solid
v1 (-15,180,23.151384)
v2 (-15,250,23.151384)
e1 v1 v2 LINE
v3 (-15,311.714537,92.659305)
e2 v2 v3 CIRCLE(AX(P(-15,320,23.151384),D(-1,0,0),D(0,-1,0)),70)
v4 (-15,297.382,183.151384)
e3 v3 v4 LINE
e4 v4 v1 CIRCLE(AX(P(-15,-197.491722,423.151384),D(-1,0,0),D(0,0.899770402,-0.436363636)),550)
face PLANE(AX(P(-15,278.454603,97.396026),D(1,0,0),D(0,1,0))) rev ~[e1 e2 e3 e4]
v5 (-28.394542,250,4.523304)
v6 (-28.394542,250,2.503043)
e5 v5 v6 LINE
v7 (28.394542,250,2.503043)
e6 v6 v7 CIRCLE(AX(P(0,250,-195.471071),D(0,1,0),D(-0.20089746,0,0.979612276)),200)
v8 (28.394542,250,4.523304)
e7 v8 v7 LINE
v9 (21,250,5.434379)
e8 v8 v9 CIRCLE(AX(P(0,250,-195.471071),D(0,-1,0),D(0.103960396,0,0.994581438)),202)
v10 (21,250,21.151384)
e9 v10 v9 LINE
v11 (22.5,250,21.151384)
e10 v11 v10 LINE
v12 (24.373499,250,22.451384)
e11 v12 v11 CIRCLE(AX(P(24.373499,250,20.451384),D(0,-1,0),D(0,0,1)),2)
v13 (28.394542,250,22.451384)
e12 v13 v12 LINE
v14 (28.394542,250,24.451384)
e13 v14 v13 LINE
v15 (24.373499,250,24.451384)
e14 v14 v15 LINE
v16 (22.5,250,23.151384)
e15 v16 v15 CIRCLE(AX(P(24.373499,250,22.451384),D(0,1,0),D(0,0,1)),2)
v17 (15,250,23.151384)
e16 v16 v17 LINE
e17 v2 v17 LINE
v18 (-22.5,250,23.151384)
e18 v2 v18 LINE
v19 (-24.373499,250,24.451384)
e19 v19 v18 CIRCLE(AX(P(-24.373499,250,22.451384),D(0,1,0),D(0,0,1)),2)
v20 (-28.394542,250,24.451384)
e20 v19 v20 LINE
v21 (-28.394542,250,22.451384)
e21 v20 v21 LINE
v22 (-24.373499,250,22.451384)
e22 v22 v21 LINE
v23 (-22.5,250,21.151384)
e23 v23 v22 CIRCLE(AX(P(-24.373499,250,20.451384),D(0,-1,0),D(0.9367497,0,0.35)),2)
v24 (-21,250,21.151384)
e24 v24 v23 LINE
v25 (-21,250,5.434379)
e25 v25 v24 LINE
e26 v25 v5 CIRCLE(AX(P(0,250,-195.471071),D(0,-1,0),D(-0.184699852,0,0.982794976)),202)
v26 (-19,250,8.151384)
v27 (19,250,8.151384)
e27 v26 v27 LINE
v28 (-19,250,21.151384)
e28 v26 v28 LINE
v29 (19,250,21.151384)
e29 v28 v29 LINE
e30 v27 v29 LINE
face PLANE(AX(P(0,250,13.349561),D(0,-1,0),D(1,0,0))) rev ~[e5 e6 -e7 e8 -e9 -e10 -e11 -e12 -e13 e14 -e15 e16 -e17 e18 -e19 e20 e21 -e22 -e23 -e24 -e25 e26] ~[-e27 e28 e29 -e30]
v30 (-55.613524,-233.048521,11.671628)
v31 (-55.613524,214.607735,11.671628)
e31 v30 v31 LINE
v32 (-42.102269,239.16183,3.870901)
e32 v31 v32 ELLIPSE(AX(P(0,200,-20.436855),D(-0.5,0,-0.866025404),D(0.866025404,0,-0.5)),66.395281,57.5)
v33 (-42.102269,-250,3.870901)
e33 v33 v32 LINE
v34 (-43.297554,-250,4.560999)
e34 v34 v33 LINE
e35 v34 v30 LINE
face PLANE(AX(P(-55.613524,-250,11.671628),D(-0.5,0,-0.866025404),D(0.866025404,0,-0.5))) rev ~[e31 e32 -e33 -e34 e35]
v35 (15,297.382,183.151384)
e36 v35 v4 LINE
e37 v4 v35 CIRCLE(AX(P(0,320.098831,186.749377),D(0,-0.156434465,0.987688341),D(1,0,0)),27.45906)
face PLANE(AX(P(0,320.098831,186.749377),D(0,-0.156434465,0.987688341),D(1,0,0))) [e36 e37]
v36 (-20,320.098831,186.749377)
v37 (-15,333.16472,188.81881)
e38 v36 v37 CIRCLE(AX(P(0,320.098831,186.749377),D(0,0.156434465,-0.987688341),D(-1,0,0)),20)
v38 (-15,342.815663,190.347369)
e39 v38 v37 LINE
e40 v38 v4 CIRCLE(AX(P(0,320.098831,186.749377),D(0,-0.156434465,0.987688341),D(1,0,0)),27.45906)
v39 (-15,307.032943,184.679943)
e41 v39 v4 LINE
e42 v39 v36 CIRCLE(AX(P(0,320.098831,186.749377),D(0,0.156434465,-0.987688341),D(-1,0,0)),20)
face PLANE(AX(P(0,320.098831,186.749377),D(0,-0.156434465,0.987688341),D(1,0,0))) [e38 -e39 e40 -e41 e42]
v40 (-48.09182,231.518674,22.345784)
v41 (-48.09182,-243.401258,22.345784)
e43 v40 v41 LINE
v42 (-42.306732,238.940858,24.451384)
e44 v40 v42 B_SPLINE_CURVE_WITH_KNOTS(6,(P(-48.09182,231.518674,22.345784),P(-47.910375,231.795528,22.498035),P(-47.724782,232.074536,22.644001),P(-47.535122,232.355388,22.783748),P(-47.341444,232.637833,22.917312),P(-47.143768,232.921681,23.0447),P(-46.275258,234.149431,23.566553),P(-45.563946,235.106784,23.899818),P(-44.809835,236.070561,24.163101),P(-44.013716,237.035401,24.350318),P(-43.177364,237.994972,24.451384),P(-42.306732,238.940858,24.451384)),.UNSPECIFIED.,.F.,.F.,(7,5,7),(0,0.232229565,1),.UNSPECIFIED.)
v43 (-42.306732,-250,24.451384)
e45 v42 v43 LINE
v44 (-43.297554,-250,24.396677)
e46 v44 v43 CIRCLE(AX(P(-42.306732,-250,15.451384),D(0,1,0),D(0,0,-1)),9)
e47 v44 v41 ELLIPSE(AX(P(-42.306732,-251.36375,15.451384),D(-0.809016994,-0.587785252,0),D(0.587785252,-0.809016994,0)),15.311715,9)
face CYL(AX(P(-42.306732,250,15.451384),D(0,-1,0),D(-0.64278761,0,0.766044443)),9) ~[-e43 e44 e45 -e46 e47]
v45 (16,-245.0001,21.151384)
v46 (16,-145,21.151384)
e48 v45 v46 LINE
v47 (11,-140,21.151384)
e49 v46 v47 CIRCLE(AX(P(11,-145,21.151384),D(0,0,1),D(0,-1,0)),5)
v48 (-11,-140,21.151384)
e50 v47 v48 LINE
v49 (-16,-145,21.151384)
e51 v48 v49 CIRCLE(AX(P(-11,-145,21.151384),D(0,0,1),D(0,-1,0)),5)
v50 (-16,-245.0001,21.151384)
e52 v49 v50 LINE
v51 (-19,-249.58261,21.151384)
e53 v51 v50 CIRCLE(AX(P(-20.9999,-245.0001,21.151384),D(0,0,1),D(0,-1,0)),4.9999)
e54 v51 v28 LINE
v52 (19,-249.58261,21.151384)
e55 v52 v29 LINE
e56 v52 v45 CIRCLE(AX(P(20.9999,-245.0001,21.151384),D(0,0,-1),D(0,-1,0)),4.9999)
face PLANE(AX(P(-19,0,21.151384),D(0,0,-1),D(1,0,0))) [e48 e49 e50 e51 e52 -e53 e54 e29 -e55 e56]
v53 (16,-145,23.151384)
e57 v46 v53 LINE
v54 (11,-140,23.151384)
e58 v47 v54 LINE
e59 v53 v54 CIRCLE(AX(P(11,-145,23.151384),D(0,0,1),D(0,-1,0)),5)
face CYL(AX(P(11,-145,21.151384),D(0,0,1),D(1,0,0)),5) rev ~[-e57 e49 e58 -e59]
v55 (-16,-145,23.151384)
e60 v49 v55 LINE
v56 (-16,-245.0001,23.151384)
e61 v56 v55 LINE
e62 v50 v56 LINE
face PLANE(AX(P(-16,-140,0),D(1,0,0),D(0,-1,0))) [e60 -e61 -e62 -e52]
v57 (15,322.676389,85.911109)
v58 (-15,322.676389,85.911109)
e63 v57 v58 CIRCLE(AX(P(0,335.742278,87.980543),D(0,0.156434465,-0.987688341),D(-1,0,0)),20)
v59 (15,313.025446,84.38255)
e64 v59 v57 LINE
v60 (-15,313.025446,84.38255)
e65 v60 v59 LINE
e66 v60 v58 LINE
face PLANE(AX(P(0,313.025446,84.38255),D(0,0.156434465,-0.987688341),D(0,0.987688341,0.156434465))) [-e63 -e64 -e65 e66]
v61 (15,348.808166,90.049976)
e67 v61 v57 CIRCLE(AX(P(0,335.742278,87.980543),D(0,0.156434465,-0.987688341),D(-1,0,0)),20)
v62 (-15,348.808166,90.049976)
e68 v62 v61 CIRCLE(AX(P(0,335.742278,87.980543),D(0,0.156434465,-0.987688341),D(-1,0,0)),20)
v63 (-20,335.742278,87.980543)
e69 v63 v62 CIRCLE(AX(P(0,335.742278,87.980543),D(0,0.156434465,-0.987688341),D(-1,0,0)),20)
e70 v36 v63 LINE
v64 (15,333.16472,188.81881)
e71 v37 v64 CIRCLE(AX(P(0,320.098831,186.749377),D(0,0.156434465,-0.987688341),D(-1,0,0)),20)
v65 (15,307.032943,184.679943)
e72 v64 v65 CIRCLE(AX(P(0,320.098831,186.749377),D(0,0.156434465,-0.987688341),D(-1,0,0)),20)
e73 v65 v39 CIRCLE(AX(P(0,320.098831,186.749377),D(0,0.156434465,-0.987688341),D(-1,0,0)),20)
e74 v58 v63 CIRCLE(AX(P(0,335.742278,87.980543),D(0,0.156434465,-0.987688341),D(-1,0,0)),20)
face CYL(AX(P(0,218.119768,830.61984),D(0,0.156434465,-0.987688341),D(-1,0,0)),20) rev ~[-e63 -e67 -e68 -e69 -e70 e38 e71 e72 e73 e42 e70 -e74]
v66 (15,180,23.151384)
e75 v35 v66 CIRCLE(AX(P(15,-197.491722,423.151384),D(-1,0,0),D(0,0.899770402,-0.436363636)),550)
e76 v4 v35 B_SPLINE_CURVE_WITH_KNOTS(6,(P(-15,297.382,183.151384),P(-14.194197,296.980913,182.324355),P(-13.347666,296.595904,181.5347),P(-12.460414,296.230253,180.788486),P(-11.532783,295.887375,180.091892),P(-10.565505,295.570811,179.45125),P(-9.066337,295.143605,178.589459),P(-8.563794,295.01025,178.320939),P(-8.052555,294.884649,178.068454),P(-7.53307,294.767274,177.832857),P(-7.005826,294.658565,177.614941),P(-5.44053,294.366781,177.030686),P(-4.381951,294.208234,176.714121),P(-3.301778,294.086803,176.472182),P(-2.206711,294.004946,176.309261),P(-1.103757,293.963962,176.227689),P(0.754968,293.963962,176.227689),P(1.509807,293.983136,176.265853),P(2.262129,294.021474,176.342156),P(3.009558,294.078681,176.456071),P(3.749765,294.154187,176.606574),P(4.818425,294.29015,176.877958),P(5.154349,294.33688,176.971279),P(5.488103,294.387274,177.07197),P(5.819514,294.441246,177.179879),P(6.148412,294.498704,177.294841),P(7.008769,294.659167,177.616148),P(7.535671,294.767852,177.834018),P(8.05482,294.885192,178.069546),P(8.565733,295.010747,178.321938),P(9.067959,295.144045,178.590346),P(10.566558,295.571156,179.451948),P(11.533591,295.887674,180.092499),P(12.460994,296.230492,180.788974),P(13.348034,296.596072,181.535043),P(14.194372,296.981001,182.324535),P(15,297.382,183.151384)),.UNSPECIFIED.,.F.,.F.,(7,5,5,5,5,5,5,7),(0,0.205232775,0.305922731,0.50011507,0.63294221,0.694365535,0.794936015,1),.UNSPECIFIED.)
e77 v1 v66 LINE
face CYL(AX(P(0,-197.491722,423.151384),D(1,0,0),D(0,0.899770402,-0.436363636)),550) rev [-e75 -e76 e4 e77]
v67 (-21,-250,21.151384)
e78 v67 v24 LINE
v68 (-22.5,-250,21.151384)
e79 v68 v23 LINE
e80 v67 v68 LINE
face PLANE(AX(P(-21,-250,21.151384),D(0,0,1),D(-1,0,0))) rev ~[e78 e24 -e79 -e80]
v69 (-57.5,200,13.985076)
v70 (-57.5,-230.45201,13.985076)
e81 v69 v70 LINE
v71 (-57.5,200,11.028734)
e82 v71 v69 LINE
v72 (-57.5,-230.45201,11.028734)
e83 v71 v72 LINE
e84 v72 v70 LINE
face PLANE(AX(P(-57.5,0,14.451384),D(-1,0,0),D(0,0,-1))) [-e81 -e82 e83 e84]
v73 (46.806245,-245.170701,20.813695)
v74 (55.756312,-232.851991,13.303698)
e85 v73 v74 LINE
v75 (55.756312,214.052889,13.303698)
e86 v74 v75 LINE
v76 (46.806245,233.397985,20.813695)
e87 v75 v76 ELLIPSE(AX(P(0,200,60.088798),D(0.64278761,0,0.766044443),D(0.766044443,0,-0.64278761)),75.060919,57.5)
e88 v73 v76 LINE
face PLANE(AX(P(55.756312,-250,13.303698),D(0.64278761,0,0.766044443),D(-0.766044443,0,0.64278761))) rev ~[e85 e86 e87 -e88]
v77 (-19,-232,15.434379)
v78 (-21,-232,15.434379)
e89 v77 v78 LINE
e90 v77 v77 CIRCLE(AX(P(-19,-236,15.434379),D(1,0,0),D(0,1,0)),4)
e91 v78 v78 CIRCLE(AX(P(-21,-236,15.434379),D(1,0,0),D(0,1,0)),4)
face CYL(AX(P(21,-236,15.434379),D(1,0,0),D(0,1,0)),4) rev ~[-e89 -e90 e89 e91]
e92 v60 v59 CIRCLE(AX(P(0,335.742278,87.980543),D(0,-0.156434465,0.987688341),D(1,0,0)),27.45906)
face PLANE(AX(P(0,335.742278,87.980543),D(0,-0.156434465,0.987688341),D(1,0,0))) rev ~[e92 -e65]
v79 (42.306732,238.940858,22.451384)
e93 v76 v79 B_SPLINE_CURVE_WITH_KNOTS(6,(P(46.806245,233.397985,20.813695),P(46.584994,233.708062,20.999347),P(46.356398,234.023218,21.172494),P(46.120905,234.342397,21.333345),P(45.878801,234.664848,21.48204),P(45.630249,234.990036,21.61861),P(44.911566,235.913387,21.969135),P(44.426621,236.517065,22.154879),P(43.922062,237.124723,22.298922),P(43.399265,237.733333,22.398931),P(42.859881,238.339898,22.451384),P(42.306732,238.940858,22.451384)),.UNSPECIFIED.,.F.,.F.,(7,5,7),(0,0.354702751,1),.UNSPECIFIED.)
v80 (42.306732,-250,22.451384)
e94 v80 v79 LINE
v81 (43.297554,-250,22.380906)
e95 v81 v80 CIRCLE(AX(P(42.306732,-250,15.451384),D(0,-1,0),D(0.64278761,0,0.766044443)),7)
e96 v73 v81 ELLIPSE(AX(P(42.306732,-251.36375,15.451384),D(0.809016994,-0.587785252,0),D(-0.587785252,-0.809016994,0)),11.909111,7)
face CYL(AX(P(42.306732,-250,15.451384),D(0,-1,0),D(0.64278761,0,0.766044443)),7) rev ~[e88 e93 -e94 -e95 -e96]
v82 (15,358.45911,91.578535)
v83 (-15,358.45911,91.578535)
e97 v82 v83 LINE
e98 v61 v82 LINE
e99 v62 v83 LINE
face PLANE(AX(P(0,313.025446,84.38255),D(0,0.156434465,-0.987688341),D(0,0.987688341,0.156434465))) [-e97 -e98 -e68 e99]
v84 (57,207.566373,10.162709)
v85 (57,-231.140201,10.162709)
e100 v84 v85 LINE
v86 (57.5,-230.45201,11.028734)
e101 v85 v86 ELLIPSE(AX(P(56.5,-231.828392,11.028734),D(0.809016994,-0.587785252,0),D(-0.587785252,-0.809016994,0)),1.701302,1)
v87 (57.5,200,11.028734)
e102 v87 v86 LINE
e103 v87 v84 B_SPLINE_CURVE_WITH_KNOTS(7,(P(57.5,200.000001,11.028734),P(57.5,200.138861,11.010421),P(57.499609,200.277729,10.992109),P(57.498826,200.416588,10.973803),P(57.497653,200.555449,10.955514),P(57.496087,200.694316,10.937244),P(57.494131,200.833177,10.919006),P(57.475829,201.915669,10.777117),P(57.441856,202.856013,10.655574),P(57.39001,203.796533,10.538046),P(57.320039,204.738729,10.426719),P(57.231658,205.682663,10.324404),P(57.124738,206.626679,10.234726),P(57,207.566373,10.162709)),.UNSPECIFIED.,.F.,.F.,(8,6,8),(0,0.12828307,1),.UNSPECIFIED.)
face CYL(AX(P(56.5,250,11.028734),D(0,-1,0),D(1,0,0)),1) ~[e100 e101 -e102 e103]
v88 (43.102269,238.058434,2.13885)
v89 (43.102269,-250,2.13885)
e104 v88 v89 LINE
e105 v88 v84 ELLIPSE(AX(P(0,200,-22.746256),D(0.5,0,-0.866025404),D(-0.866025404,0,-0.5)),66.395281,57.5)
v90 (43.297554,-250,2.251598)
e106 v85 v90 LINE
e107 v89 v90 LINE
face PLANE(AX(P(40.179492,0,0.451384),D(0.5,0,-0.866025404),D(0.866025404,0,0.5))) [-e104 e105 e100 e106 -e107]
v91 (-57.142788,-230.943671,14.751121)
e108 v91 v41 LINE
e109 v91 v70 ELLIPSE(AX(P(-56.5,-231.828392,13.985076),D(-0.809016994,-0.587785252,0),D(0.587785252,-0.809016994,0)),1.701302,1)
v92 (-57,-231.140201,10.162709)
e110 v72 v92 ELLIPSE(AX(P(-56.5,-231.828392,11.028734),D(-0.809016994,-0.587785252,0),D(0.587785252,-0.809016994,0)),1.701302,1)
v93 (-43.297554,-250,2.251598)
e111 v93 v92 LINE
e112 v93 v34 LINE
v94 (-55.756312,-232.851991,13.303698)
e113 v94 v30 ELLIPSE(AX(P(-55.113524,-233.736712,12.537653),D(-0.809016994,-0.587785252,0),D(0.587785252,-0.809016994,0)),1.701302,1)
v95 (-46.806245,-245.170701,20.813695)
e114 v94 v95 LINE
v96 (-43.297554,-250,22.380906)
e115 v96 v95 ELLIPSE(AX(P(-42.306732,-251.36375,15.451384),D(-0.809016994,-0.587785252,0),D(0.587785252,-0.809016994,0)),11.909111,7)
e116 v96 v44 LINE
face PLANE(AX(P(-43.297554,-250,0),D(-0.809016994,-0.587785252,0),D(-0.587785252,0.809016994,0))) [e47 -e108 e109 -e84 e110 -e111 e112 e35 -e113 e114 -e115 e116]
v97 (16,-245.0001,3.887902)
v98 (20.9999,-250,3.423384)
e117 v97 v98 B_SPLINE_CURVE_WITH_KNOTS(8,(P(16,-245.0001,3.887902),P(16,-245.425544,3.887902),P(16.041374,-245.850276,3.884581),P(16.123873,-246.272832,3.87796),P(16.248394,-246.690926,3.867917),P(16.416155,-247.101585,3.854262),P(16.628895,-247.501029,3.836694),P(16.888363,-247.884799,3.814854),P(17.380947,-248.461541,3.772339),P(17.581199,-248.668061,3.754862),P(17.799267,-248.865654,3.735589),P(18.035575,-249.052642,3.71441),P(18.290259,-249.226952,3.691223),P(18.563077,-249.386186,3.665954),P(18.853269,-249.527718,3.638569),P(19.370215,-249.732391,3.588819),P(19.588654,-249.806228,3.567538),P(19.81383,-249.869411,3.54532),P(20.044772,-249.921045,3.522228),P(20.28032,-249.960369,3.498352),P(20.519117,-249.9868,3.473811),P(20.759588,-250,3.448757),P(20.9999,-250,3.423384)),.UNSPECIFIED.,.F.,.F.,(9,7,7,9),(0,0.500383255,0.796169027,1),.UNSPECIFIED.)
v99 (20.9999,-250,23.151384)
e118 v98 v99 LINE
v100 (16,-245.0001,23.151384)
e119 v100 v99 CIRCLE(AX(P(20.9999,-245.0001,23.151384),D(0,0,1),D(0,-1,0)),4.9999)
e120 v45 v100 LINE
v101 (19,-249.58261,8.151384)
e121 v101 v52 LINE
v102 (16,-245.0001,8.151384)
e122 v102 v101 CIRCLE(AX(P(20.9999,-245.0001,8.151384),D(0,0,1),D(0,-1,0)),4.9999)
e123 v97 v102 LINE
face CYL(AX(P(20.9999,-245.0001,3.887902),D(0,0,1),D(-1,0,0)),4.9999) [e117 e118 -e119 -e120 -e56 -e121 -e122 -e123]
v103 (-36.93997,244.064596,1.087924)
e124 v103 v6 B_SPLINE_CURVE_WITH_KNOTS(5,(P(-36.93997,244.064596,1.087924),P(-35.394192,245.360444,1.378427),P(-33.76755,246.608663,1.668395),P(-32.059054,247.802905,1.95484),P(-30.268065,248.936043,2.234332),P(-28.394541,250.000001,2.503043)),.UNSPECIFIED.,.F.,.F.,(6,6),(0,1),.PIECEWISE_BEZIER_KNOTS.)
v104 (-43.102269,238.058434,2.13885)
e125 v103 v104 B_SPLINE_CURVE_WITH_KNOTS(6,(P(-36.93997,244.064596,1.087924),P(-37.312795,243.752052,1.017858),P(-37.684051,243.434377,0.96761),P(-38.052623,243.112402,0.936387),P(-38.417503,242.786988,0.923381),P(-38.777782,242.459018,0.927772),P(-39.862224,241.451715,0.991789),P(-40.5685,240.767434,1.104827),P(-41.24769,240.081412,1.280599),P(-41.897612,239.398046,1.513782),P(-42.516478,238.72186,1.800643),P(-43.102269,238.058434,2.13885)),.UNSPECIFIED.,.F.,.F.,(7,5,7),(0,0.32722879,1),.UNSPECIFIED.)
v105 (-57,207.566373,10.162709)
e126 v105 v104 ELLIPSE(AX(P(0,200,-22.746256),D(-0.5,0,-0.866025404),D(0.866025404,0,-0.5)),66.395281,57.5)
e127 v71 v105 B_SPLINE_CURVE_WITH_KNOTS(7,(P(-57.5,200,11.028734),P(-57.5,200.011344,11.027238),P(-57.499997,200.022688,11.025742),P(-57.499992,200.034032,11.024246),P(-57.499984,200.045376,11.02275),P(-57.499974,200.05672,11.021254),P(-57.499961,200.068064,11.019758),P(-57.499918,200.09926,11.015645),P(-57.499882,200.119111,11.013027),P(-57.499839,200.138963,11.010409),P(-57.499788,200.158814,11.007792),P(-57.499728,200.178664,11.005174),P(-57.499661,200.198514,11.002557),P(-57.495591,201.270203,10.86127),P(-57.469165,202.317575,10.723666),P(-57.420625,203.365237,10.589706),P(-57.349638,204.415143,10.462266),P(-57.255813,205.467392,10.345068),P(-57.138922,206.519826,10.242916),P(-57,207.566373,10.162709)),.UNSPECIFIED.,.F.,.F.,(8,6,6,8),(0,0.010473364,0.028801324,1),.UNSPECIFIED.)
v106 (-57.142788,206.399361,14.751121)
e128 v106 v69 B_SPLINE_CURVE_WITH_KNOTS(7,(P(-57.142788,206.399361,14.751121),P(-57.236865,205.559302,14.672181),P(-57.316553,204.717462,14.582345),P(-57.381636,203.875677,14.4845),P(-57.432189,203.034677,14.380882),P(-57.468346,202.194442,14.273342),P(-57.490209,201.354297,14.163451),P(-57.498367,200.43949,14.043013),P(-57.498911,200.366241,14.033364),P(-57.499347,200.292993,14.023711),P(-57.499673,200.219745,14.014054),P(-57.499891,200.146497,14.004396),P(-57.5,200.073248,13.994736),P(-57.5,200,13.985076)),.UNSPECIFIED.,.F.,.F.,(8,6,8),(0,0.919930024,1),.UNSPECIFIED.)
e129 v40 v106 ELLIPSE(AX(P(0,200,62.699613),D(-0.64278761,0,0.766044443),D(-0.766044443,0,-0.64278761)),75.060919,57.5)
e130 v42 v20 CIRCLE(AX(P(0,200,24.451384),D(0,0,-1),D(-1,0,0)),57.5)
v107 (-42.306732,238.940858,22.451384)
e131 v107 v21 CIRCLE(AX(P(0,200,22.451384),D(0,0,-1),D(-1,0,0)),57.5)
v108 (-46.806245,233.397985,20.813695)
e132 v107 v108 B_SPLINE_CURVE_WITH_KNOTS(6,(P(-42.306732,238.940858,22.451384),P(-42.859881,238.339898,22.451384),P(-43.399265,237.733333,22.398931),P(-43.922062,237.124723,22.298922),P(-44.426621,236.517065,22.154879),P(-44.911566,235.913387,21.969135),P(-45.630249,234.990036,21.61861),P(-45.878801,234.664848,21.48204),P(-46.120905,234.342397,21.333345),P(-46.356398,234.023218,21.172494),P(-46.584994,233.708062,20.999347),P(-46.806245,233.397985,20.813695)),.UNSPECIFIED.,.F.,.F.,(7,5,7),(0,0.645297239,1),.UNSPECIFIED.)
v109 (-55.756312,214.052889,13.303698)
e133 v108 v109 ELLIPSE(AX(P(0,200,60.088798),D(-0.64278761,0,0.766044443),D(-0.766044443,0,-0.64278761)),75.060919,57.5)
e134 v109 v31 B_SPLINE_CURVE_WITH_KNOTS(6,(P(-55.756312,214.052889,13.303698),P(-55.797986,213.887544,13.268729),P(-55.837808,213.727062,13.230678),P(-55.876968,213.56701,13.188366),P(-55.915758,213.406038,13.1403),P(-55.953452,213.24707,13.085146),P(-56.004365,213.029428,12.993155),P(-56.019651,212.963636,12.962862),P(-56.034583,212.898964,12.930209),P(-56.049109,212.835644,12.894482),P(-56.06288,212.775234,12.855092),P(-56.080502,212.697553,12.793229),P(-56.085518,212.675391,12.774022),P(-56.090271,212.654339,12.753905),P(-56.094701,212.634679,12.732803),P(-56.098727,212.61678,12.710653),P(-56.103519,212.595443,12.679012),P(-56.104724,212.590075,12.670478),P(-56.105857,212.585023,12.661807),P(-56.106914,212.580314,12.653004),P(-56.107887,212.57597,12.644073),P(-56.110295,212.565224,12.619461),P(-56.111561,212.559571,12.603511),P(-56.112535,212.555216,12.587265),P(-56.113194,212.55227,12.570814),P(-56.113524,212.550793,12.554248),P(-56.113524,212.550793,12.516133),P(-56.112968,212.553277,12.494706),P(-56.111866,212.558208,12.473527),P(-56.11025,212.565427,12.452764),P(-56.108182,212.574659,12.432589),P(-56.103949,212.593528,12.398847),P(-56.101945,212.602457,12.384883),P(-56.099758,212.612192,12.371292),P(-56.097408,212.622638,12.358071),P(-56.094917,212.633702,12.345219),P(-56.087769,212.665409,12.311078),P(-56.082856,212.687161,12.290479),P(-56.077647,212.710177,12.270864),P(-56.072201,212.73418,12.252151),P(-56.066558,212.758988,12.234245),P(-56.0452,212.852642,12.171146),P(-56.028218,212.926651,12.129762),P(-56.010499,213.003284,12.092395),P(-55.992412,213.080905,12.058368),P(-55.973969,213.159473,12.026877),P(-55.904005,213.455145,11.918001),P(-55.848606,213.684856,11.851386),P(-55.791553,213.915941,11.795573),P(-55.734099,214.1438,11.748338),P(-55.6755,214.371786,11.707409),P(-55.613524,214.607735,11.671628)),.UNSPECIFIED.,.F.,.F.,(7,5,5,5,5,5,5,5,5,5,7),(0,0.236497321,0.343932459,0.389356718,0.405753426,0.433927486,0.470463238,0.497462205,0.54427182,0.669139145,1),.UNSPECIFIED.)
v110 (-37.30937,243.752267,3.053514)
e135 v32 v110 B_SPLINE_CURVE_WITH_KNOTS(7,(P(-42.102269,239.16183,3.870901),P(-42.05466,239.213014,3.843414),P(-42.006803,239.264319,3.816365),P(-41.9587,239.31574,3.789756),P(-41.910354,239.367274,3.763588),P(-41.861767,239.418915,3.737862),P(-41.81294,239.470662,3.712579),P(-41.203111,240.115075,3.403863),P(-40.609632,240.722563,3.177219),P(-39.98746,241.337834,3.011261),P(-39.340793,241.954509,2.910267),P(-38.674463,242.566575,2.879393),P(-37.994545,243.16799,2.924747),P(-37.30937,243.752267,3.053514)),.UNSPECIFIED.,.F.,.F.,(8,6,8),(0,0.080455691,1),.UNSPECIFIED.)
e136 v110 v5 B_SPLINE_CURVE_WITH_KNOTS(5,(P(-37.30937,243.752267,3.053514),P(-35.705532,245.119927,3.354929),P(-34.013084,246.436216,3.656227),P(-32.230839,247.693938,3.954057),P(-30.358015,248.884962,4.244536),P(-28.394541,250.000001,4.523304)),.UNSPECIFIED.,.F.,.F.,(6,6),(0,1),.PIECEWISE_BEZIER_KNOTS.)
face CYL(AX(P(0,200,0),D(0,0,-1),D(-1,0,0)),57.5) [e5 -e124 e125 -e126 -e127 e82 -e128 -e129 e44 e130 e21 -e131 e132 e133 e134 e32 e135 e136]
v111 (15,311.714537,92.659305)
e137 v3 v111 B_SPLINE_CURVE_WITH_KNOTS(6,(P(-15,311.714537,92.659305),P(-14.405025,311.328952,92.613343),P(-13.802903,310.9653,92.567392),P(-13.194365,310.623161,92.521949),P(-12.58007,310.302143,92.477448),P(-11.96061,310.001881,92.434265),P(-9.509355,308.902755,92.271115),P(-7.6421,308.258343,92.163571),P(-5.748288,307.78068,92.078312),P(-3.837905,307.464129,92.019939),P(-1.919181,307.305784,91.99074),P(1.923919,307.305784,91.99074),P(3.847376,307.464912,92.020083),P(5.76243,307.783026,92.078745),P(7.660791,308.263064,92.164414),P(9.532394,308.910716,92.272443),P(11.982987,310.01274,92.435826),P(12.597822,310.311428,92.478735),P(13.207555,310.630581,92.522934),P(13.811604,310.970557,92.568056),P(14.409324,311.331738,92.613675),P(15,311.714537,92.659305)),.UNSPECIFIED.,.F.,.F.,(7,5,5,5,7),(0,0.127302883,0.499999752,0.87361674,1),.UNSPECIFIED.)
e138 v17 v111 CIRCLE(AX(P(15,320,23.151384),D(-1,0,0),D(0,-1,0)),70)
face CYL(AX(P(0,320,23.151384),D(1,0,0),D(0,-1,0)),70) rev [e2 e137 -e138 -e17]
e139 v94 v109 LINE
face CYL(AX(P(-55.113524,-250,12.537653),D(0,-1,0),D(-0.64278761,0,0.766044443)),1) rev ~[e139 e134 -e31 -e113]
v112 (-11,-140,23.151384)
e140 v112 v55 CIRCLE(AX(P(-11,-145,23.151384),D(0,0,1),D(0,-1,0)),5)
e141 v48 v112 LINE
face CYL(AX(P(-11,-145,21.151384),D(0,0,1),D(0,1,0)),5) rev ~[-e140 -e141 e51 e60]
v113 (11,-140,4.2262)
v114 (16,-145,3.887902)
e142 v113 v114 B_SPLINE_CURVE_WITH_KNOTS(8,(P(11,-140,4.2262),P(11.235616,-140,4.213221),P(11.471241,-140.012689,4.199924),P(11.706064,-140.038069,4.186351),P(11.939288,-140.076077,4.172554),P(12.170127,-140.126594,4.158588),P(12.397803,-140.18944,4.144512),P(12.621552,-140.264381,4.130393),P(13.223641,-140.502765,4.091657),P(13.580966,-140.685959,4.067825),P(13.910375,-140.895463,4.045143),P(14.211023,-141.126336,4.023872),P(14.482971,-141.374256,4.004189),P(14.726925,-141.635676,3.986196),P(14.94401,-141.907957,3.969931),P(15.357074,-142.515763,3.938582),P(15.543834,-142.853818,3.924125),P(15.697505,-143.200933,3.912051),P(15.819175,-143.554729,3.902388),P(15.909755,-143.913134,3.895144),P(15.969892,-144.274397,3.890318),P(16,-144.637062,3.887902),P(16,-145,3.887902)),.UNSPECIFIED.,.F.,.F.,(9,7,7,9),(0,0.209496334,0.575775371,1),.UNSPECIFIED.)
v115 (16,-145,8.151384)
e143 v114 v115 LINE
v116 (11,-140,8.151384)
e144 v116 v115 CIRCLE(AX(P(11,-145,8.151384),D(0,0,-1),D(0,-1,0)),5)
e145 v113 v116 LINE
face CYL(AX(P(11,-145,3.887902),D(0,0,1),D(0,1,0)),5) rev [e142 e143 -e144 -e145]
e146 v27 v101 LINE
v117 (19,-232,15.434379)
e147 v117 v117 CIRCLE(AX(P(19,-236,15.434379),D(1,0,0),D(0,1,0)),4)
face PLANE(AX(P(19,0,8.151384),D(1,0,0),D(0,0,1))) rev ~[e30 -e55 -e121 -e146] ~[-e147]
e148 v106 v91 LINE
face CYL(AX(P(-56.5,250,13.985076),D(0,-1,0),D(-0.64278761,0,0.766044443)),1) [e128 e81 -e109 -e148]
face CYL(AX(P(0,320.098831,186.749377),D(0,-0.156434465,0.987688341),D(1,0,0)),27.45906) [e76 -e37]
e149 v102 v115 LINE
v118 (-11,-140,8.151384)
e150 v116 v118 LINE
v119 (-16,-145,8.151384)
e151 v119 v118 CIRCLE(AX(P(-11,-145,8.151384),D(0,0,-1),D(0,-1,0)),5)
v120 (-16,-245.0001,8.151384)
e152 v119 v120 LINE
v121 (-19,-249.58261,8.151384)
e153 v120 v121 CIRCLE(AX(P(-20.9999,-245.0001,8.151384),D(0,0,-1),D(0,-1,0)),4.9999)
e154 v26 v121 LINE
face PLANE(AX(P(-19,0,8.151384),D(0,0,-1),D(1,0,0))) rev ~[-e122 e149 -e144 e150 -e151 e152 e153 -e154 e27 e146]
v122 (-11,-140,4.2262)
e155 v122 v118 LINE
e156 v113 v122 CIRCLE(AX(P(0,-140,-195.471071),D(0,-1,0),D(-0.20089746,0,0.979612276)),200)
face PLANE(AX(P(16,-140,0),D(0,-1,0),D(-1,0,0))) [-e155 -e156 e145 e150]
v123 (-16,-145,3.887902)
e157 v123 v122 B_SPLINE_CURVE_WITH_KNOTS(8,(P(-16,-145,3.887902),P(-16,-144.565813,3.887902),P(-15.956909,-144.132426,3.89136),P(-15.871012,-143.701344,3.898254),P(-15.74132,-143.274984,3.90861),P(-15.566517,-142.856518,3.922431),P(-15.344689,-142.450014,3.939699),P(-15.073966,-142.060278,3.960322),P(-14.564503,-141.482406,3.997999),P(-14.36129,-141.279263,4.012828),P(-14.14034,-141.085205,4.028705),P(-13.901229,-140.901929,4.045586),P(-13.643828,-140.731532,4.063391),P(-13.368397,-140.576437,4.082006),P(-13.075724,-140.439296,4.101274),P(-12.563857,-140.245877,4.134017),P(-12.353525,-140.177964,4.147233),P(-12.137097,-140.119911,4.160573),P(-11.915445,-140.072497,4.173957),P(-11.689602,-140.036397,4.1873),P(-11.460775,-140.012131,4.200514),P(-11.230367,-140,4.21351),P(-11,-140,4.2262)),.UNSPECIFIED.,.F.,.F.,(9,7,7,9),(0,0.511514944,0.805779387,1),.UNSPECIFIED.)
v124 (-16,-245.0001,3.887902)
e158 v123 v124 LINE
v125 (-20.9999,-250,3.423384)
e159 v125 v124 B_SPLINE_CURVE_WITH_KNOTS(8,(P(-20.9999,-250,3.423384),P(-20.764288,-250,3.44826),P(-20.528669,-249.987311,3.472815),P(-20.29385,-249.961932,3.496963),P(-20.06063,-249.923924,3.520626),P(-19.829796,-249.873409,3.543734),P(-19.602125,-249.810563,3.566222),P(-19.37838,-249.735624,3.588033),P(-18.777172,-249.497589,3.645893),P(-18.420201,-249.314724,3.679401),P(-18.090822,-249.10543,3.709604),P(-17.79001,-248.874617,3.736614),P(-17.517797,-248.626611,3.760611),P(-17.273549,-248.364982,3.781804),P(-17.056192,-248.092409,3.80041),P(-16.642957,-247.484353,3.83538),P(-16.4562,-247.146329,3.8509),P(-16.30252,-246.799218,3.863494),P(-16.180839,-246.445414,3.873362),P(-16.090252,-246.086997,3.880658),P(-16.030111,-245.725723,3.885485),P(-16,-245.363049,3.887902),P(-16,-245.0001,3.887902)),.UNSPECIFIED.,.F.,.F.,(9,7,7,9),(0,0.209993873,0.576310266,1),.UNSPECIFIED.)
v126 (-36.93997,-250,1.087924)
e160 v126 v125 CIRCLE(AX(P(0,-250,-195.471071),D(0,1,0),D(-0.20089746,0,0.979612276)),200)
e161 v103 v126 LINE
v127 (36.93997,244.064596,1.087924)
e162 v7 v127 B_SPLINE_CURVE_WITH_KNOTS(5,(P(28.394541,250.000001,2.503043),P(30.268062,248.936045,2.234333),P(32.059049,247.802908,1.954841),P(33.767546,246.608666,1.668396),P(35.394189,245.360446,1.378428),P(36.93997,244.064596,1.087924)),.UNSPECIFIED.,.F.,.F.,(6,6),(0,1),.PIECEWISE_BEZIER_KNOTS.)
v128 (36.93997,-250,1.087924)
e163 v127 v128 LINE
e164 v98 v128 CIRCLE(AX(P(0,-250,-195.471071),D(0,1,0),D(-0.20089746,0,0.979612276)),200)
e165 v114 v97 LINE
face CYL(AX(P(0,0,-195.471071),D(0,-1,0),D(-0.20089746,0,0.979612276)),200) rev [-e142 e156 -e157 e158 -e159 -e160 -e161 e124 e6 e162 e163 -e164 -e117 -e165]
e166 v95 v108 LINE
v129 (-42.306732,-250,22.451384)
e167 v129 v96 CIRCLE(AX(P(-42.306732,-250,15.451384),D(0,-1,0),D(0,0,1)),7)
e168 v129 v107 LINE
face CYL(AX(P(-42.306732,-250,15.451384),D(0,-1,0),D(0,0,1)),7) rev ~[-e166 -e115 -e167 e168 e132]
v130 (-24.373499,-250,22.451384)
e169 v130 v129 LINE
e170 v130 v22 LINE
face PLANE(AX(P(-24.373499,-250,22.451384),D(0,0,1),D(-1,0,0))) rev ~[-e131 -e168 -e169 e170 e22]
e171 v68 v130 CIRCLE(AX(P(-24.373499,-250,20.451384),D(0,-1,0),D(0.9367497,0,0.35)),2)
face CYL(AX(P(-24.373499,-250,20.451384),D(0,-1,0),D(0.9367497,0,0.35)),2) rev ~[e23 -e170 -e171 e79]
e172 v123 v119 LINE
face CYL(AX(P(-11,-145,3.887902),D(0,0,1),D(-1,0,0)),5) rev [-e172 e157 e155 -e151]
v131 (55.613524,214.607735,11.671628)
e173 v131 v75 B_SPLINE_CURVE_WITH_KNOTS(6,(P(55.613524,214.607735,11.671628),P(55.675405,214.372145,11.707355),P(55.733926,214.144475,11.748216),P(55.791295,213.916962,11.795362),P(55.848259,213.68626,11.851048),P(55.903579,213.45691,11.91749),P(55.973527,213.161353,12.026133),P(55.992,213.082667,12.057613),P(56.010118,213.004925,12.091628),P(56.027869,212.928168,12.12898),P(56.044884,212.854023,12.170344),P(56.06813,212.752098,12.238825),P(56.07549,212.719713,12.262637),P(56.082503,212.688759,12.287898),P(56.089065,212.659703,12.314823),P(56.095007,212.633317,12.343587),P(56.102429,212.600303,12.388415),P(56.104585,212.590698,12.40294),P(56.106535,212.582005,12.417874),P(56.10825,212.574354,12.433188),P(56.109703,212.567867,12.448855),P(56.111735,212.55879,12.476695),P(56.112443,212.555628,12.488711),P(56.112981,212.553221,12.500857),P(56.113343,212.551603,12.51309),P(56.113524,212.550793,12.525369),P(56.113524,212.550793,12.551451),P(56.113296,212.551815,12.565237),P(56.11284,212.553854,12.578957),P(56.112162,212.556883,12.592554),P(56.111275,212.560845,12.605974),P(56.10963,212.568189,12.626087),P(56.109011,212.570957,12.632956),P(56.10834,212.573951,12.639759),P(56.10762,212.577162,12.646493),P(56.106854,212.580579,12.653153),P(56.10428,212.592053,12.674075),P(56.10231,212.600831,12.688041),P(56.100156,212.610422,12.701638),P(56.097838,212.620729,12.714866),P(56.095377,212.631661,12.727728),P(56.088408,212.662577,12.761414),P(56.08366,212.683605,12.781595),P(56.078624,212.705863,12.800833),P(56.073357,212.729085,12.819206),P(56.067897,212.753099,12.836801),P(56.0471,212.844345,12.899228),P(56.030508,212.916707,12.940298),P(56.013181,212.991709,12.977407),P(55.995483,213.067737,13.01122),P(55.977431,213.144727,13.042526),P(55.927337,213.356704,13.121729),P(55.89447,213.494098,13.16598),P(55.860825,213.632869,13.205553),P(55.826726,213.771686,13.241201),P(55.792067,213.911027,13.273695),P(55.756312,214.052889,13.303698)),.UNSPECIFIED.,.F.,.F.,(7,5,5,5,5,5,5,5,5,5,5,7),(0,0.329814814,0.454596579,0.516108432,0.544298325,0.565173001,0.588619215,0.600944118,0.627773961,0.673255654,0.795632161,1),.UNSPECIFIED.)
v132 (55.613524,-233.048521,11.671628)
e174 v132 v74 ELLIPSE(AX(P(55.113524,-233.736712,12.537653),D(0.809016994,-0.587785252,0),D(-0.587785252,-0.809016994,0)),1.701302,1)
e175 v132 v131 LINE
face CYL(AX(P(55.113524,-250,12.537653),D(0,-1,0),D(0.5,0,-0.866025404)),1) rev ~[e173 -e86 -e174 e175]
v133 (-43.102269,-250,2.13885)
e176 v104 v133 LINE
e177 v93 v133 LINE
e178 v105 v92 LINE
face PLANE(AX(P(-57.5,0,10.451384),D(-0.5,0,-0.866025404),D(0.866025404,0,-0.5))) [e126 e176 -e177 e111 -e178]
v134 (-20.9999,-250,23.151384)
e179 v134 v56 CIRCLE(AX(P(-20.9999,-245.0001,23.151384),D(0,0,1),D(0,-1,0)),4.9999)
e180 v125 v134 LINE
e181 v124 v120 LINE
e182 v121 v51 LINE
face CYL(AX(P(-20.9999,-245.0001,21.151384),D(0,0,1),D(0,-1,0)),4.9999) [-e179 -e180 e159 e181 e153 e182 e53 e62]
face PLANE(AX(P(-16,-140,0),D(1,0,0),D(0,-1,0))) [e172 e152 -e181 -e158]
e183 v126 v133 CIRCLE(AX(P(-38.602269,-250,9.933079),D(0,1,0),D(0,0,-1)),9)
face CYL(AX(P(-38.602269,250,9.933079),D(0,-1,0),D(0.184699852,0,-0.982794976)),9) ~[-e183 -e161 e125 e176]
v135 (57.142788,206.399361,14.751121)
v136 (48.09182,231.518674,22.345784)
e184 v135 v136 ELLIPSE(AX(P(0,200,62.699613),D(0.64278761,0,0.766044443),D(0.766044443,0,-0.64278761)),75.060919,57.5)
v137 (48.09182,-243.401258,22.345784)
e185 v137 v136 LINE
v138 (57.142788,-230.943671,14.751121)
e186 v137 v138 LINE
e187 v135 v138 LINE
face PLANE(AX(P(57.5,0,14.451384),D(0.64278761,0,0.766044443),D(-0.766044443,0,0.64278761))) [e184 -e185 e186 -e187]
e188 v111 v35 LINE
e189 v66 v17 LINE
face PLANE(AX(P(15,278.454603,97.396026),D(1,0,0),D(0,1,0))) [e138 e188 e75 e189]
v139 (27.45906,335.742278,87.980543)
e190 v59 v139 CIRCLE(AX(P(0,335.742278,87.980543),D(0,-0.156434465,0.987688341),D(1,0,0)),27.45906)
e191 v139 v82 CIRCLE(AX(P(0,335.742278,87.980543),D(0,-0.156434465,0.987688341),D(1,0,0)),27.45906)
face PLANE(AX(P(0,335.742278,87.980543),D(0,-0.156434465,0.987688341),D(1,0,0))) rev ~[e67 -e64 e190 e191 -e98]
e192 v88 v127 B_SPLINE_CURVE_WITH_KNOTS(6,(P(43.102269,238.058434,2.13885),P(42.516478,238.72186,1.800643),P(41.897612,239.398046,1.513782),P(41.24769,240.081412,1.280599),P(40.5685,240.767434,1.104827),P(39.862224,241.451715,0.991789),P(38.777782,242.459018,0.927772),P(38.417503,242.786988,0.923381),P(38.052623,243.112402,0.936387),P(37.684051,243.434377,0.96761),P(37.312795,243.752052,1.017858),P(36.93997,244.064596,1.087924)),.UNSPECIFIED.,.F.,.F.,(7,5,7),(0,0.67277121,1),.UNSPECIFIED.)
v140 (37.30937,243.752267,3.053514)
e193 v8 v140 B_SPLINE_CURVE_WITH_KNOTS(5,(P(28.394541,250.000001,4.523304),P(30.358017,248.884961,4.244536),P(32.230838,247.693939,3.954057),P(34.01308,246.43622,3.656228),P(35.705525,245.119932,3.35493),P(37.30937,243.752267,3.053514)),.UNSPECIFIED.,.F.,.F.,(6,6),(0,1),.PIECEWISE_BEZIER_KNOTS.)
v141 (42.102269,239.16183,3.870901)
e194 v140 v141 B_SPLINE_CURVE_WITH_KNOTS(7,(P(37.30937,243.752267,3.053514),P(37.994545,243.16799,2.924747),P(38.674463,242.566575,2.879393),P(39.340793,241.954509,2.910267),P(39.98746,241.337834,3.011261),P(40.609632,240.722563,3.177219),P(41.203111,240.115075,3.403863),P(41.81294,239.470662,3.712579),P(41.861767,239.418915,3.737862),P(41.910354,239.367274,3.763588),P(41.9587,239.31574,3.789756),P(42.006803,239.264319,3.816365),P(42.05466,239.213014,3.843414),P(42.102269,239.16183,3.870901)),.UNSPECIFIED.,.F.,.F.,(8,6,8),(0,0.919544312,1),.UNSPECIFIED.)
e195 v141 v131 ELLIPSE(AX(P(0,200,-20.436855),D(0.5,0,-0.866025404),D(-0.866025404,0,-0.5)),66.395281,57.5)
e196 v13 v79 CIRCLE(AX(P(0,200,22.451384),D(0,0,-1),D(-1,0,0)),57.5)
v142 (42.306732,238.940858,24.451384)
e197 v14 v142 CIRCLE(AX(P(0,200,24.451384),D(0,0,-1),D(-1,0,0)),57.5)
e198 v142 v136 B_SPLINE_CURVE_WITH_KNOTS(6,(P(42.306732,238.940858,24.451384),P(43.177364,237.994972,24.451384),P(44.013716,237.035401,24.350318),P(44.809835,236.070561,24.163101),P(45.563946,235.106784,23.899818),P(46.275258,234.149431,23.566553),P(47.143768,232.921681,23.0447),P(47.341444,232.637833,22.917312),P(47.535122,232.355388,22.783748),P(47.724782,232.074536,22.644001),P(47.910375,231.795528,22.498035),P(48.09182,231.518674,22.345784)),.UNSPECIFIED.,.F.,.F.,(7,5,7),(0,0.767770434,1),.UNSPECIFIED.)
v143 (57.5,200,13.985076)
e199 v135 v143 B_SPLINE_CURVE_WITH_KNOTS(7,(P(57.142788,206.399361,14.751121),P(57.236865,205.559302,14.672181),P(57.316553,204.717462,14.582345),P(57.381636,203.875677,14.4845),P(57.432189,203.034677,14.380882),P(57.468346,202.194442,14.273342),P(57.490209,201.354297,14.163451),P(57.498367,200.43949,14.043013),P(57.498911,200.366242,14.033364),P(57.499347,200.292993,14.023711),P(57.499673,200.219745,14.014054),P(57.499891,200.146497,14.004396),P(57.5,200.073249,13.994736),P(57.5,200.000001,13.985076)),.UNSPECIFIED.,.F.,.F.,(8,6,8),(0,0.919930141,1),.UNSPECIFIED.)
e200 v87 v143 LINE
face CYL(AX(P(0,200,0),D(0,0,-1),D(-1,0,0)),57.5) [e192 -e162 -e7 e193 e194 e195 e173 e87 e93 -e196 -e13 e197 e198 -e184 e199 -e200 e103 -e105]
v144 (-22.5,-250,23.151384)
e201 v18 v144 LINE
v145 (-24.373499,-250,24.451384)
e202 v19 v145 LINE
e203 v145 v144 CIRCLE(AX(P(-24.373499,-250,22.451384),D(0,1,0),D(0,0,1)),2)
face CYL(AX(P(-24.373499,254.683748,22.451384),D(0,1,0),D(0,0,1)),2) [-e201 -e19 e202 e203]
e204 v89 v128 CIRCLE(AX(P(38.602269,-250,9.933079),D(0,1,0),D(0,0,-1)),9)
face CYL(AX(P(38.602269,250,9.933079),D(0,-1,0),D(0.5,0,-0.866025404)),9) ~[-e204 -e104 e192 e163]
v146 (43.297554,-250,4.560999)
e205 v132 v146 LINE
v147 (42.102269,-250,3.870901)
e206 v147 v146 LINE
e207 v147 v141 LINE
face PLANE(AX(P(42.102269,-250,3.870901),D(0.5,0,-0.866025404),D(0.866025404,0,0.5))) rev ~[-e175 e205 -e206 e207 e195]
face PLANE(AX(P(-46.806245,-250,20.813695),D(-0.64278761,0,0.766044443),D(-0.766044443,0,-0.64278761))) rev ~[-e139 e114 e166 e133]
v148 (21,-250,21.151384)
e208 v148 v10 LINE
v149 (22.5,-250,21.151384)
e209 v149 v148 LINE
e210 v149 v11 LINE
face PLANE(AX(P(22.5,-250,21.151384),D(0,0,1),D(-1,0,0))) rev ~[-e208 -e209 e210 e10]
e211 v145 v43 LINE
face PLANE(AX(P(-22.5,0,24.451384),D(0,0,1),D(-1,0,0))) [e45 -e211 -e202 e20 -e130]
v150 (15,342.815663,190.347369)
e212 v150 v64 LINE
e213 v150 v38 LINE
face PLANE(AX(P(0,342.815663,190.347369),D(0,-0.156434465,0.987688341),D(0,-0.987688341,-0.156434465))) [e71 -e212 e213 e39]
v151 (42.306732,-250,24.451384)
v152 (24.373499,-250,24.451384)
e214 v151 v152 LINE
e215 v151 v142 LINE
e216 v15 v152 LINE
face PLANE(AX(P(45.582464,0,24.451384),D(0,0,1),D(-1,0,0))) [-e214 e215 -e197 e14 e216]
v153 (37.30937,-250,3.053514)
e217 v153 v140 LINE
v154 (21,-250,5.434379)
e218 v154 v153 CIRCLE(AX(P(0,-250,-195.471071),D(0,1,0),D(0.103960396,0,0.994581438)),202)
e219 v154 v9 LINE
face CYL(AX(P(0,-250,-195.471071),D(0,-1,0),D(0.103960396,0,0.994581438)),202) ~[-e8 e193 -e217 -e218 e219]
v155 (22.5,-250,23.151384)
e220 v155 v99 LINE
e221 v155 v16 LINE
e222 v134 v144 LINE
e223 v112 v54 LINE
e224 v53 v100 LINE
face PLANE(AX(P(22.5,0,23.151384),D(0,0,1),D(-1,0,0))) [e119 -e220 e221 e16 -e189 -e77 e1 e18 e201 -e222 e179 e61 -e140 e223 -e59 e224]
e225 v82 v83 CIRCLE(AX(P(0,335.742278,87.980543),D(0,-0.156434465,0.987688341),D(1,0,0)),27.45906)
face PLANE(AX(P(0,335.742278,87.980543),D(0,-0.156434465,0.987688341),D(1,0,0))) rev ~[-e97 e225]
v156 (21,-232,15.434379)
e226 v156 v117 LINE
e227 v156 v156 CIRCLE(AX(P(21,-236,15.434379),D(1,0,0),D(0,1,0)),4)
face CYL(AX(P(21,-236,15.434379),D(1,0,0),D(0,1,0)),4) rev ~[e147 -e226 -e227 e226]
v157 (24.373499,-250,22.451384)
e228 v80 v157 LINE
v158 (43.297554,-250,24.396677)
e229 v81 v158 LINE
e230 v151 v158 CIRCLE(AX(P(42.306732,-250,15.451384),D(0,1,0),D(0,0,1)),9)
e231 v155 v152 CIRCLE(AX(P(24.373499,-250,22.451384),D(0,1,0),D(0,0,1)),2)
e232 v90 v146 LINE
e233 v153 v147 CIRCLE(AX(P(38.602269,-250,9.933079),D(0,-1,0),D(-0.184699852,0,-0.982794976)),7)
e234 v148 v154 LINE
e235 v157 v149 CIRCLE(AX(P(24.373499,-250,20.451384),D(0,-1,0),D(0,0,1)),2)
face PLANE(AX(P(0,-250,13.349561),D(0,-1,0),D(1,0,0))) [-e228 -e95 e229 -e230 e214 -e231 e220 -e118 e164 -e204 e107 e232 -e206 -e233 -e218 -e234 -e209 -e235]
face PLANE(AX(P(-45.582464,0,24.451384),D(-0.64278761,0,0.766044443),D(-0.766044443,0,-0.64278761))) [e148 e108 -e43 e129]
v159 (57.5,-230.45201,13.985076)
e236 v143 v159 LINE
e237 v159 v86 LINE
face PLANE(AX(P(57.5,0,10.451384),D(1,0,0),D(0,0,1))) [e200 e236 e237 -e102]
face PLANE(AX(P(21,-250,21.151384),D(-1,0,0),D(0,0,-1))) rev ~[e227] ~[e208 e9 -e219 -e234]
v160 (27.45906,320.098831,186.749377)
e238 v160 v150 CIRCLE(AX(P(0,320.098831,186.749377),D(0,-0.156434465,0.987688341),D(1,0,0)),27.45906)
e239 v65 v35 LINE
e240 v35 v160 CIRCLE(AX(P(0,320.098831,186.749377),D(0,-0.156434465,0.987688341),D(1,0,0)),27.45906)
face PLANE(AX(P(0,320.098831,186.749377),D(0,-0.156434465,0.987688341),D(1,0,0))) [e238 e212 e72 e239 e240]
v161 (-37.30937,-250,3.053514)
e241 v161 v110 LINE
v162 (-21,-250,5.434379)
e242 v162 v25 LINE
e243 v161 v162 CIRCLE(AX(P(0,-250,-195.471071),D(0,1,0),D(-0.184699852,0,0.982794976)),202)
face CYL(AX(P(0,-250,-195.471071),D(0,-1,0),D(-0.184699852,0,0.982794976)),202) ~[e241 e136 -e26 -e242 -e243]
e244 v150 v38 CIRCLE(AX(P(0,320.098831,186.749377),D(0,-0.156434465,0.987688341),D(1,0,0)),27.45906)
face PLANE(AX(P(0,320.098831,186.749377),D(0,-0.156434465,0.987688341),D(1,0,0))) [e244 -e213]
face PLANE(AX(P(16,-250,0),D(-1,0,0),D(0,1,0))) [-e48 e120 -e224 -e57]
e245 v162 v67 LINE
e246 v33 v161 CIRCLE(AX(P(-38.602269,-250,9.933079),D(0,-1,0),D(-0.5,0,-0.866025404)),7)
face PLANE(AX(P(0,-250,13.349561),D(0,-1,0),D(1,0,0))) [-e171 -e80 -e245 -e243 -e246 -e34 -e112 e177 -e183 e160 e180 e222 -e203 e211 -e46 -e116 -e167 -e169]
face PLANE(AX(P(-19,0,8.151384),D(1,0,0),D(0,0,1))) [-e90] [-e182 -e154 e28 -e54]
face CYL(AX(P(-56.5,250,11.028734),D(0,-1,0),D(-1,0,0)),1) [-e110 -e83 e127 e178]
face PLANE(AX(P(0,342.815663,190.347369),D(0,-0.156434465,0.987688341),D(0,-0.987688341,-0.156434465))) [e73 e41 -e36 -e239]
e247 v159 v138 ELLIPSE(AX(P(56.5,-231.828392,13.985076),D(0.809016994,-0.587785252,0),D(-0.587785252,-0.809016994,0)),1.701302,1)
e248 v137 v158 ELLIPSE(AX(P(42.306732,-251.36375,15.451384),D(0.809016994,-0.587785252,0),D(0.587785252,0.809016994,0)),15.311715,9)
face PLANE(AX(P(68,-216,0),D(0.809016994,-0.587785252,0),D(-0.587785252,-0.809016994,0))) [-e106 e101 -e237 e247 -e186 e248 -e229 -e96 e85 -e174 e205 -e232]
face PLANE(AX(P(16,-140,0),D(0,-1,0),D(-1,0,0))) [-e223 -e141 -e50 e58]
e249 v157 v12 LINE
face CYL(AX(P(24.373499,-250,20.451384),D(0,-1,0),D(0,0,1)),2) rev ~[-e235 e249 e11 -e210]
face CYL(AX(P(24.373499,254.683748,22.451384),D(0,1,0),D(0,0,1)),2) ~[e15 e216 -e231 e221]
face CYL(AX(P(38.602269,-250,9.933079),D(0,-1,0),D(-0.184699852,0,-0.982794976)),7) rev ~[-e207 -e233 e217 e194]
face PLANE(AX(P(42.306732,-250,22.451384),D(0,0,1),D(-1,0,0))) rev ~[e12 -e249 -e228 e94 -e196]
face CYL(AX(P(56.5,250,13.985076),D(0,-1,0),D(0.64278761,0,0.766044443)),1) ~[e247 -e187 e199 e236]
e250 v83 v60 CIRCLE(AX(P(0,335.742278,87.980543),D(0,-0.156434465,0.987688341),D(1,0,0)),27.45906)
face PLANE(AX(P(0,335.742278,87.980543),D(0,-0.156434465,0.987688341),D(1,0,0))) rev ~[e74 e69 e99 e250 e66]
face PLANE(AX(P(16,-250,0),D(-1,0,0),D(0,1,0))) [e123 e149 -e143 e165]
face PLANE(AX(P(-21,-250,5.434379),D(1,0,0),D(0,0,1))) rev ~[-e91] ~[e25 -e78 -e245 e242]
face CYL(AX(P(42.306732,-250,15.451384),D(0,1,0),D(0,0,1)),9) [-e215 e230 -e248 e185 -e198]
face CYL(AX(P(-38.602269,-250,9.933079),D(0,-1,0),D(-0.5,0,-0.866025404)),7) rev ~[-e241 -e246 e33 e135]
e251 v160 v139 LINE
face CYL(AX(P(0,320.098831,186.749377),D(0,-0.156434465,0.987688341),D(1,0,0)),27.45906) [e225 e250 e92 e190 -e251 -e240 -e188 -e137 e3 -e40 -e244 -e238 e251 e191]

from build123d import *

# Parameters (mm, degrees)
F1_DEPTH       = 250
F2_W           = 38
F2_H           = 13
F3_DEPTH       = 250
F4_T1_DEPTH    = 509.3674969976
F5_R           = 9
F6_R           = 1
F8_DEPTH       = 500.001
F10_DEPTH      = 24.4523840141
F10_DEPTH_BACK = 527
F12_DEPTH      = 527
F12_DEPTH_BACK = 24.4523841141
F13_F1_R       = 4.9999
F13_F2_R       = 4.9999
F13_F3_R       = 5
F13_F4_R       = 5
F13_F5_R       = 5
F13_F6_R       = 5
F15_DEPTH      = 15
F16_R          = 27.4590604355
F17_DEPTH      = 100
F19_D          = 40
F21_D          = 8
F21_DEPTH      = 50
F21_TIP        = 2.4034424761


# Not quite as in the source:
# - a fillet or chamfer that OpenCascade refuses, or shapes differently, is made with other operations: its cross-section is extruded or revolved along the edge and cut away or added
# - a fillet or chamfer is up to 0.001 mm smaller than in the source, because OpenCascade refuses the exact size
# - an extrude ends at something that could not be found from the text; its depth is read off the source's solid


with BuildPart() as f1:
    # F0 (on Front) → F1 (new body, symmetric)
    with BuildSketch(Plane.XZ):
        with BuildLine():
            Line((22.5, 23.1513840141), (0, 23.1513840141))
            Line((0, 23.1513840141), (-22.5, 23.1513840141))
            Line((-22.5, 23.1513840141), (-22.5, 24.4513840141))
            Line((-22.5, 24.4513840141), (-45.5824640741, 24.4513840141))
            Line((-45.5824640741, 24.4513840141), (-57.5, 14.4513840141))
            Line((-57.5, 14.4513840141), (-57.5, 10.4513840141))
            Line((-57.5, 10.4513840141), (-40.1794919243, 0.4513840141))
            ThreePointArc((-40.1794919243, 0.4513840141), (0, 4.5289288725), (40.1794919243, 0.4513840141))
            Line((40.1794919243, 0.4513840141), (57.5, 10.4513840141))
            Line((57.5, 10.4513840141), (57.5, 14.4513840141))
            Line((57.5, 14.4513840141), (45.5824640741, 24.4513840141))
            Line((45.5824640741, 24.4513840141), (22.5, 24.4513840141))
            Line((22.5, 24.4513840141), (22.5, 23.1513840141))
        make_face()
    extrude(amount=F1_DEPTH, both=True)

    # F2 (on Front) → F3 (cut, symmetric)
    with BuildSketch(Plane.XZ):
        with Locations((0, 14.6513840141)):
            Rectangle(F2_W, F2_H)
    extrude(amount=F3_DEPTH, both=True, mode=Mode.SUBTRACT)

    # F4: fillet of radius 2 on 2 edges, made by hand

    # F4_s2 → F4_t1 (cut)
    with BuildSketch(Plane.XZ.offset(-254.6837484988)):
        with BuildLine():
            ThreePointArc((-24.3734993995, 24.4513840141), (-23.2333239744, 24.0945516866), (-22.5, 23.1513840141))
            Line((-22.5, 23.1513840141), (-22.5, 24.4513840141))
            Line((-22.5, 24.4513840141), (-24.3734993995, 24.4513840141))
        make_face()
        with BuildLine():
            ThreePointArc((24.3734993995, 24.4513840141), (23.2333239744, 24.0945516866), (22.5, 23.1513840141))
            Line((22.5, 23.1513840141), (22.5, 24.4513840141))
            Line((22.5, 24.4513840141), (24.3734993995, 24.4513840141))
        make_face()
    extrude(amount=F4_T1_DEPTH, mode=Mode.SUBTRACT)

    # F5
    f5_edges = [f1.edges().sort_by_distance(p)[0] for p in [
        (-45.582464, 0, 24.451384),
        (-40.179492, 0, 0.451384),
        (40.179492, 0, 0.451384),
        (45.582464, 0, 24.451384),
    ]]
    fillet(f5_edges, radius=F5_R)

    # F6
    f6_edges = [f1.edges().sort_by_distance(p)[0] for p in [
        (57.5, 0, 14.451384),
        (57.5, 0, 10.451384),
        (-57.5, 0, 10.451384),
        (-57.5, 0, 14.451384),
    ]]
    fillet(f6_edges, radius=F6_R)

    # F7 (on face) → F8 (cut, through all)
    with BuildSketch(Plane.XZ.offset(250)):
        with BuildLine():
            ThreePointArc((-42.1022690923, 3.8709010064), (-39.7790673433, 3.0327059534), (-37.3093701274, 3.0535140017))
            ThreePointArc((-37.3093701274, 3.0535140017), (-29.1789785809, 4.4103617496), (-21, 5.4343792715))
            Line((-21, 5.4343792715), (-21, 21.1513840141))
            Line((-21, 21.1513840141), (-22.5, 21.1513840141))
            ThreePointArc((-22.5, 21.1513840141), (-23.2333239744, 22.0945516866), (-24.3734993995, 22.4513840141))
            Line((-24.3734993995, 22.4513840141), (-42.3067319657, 22.4513840141))
            ThreePointArc((-42.3067319657, 22.4513840141), (-44.7008729689, 22.0292323596), (-46.8062452335, 20.813695116))
            Line((-46.8062452335, 20.813695116), (-55.7563117574, 13.3036975967))
            ThreePointArc((-55.7563117574, 13.3036975967), (-56.1097188459, 12.4504974108), (-55.6135241478, 11.6716277498))
            Line((-55.6135241478, 11.6716277498), (-42.1022690923, 3.8709010064))
        make_face()
        with BuildLine():
            Line((21, 21.1513840141), (21, 5.4343792715))
            ThreePointArc((21, 5.4343792715), (29.1789785809, 4.4103617496), (37.3093701274, 3.0535140017))
            ThreePointArc((37.3093701274, 3.0535140017), (39.7790673433, 3.0327059534), (42.1022690923, 3.8709010064))
            Line((42.1022690923, 3.8709010064), (55.6135241478, 11.6716277498))
            ThreePointArc((55.6135241478, 11.6716277498), (56.1097188459, 12.4504974108), (55.7563117574, 13.3036975967))
            Line((55.7563117574, 13.3036975967), (46.8062452335, 20.813695116))
            ThreePointArc((46.8062452335, 20.813695116), (44.7008729689, 22.0292323596), (42.3067319657, 22.4513840141))
            Line((42.3067319657, 22.4513840141), (24.3734993995, 22.4513840141))
            ThreePointArc((24.3734993995, 22.4513840141), (23.2333239744, 22.0945516866), (22.5, 21.1513840141))
            Line((22.5, 21.1513840141), (21, 21.1513840141))
        make_face()
    extrude(amount=-F8_DEPTH, mode=Mode.SUBTRACT)

    # F9 (on Top) → F10 (cut, two sides)
    with BuildSketch(Plane.XY) as f10_sk:
        with BuildLine():
            ThreePointArc((-57.5, 200), (0, 257.5), (57.5, 200))
            Line((57.5, 200), (57.5, 280))
            Line((57.5, 280), (-57.5, 280))
            Line((-57.5, 280), (-57.5, 200))
        make_face()
    extrude(amount=F10_DEPTH, mode=Mode.SUBTRACT)
    extrude(f10_sk.sketch, amount=-F10_DEPTH_BACK, mode=Mode.SUBTRACT)

    # F11 (on Top) → F12 (cut, two sides)
    with BuildSketch(Plane.XY) as f12_sk:
        Polygon((-43.2975540478, -250), (-68, -216), (-68, -346), (68, -346), (68, -216), (43.2975540478, -250), (16, -250), (16, -140), (-16, -140), (-16, -250), align=None)
    extrude(amount=-F12_DEPTH, mode=Mode.SUBTRACT)
    extrude(f12_sk.sketch, amount=F12_DEPTH_BACK, mode=Mode.SUBTRACT)

    # F13: fillet of radius 5 on 8 edges, made by hand

    # F13_f1 (radius 5 in the source; OpenCascade refuses exactly that, so slightly less here)
    f13_f1_edges = [f1.edges().sort_by_distance(p)[0] for p in [
        (-16, -250, 22.1513840141),
    ]]
    fillet(f13_f1_edges, radius=F13_F1_R)

    # F13_f2 (radius 5 in the source; OpenCascade refuses exactly that, so slightly less here)
    f13_f2_edges = [f1.edges().sort_by_distance(p)[0] for p in [
        (16, -250, 6.0196427984),
    ]]
    fillet(f13_f2_edges, radius=F13_F2_R)

    # F13_f3
    f13_f3_edges = [f1.edges().sort_by_distance(p)[0] for p in [
        (16, -140, 22.1513840141),
    ]]
    fillet(f13_f3_edges, radius=F13_F3_R)

    # F13_f4
    f13_f4_edges = [f1.edges().sort_by_distance(p)[0] for p in [
        (-16, -140, 22.1513840141),
    ]]
    fillet(f13_f4_edges, radius=F13_F4_R)

    # F13_f5
    f13_f5_edges = [f1.edges().sort_by_distance(p)[0] for p in [
        (-16, -140, 6.0196427984),
    ]]
    fillet(f13_f5_edges, radius=F13_F5_R)

    # F13_f6
    f13_f6_edges = [f1.edges().sort_by_distance(p)[0] for p in [
        (16, -140, 6.0196427984),
    ]]
    fillet(f13_f6_edges, radius=F13_F6_R)

    # F14 (on Right) → F15 (join, symmetric)
    with BuildSketch(Plane.YZ):
        with BuildLine():
            ThreePointArc((297.3819995028, 183.1513840141), (245.9666940414, 97.8136618671), (180, 23.1513840141))
            Line((180, 23.1513840141), (250, 23.1513840141))
            ThreePointArc((250, 23.1513840141), (267.6550746197, 69.6272787008), (311.7145367693, 92.6593051387))
            Line((311.7145367693, 92.6593051387), (313.0254460068, 84.3825499546))
            Line((313.0254460068, 84.3825499546), (358.4591096742, 91.5785353465))
            Line((358.4591096742, 91.5785353465), (342.8156631702, 190.347369406))
            Line((342.8156631702, 190.347369406), (297.3819995028, 183.1513840141))
        make_face()
    extrude(amount=F15_DEPTH, both=True)

    # F16 (on face) → F17 (join, through all)
    with BuildSketch(Plane(origin=(0, -21.0209895784, 132.7213047908), x_dir=(1, 0, 0), z_dir=(0, -0.156434465, 0.9876883406))):
        with Locations((0, 345.3719223914)):
            Circle(F16_R)
    extrude(amount=-F17_DEPTH)

    # F19 (through all)
    with Locations(Plane(origin=(0, -21.0209895784, 132.7213047908), x_dir=(1, 0, 0), z_dir=(0, -0.156434465, 0.9876883406))):
        with Locations((0, 345.3719223914)):
            Hole(F19_D / 2)

    # F21 (one way)
    with BuildSketch(Plane.YZ.offset(21)):
        with Locations((-236, 15.4343792715)):
            Circle(F21_D / 2)
    extrude(amount=-F21_DEPTH, mode=Mode.SUBTRACT)
    with Locations(Plane.YZ.offset(21)):
        with Locations((-236, 15.4343792715)):
            with Locations((0, 0, -(F21_DEPTH + F21_TIP / 2))):  # 118° drill point
                Cone(0, F21_D / 2, F21_TIP, mode=Mode.SUBTRACT)


solid = f1.part
